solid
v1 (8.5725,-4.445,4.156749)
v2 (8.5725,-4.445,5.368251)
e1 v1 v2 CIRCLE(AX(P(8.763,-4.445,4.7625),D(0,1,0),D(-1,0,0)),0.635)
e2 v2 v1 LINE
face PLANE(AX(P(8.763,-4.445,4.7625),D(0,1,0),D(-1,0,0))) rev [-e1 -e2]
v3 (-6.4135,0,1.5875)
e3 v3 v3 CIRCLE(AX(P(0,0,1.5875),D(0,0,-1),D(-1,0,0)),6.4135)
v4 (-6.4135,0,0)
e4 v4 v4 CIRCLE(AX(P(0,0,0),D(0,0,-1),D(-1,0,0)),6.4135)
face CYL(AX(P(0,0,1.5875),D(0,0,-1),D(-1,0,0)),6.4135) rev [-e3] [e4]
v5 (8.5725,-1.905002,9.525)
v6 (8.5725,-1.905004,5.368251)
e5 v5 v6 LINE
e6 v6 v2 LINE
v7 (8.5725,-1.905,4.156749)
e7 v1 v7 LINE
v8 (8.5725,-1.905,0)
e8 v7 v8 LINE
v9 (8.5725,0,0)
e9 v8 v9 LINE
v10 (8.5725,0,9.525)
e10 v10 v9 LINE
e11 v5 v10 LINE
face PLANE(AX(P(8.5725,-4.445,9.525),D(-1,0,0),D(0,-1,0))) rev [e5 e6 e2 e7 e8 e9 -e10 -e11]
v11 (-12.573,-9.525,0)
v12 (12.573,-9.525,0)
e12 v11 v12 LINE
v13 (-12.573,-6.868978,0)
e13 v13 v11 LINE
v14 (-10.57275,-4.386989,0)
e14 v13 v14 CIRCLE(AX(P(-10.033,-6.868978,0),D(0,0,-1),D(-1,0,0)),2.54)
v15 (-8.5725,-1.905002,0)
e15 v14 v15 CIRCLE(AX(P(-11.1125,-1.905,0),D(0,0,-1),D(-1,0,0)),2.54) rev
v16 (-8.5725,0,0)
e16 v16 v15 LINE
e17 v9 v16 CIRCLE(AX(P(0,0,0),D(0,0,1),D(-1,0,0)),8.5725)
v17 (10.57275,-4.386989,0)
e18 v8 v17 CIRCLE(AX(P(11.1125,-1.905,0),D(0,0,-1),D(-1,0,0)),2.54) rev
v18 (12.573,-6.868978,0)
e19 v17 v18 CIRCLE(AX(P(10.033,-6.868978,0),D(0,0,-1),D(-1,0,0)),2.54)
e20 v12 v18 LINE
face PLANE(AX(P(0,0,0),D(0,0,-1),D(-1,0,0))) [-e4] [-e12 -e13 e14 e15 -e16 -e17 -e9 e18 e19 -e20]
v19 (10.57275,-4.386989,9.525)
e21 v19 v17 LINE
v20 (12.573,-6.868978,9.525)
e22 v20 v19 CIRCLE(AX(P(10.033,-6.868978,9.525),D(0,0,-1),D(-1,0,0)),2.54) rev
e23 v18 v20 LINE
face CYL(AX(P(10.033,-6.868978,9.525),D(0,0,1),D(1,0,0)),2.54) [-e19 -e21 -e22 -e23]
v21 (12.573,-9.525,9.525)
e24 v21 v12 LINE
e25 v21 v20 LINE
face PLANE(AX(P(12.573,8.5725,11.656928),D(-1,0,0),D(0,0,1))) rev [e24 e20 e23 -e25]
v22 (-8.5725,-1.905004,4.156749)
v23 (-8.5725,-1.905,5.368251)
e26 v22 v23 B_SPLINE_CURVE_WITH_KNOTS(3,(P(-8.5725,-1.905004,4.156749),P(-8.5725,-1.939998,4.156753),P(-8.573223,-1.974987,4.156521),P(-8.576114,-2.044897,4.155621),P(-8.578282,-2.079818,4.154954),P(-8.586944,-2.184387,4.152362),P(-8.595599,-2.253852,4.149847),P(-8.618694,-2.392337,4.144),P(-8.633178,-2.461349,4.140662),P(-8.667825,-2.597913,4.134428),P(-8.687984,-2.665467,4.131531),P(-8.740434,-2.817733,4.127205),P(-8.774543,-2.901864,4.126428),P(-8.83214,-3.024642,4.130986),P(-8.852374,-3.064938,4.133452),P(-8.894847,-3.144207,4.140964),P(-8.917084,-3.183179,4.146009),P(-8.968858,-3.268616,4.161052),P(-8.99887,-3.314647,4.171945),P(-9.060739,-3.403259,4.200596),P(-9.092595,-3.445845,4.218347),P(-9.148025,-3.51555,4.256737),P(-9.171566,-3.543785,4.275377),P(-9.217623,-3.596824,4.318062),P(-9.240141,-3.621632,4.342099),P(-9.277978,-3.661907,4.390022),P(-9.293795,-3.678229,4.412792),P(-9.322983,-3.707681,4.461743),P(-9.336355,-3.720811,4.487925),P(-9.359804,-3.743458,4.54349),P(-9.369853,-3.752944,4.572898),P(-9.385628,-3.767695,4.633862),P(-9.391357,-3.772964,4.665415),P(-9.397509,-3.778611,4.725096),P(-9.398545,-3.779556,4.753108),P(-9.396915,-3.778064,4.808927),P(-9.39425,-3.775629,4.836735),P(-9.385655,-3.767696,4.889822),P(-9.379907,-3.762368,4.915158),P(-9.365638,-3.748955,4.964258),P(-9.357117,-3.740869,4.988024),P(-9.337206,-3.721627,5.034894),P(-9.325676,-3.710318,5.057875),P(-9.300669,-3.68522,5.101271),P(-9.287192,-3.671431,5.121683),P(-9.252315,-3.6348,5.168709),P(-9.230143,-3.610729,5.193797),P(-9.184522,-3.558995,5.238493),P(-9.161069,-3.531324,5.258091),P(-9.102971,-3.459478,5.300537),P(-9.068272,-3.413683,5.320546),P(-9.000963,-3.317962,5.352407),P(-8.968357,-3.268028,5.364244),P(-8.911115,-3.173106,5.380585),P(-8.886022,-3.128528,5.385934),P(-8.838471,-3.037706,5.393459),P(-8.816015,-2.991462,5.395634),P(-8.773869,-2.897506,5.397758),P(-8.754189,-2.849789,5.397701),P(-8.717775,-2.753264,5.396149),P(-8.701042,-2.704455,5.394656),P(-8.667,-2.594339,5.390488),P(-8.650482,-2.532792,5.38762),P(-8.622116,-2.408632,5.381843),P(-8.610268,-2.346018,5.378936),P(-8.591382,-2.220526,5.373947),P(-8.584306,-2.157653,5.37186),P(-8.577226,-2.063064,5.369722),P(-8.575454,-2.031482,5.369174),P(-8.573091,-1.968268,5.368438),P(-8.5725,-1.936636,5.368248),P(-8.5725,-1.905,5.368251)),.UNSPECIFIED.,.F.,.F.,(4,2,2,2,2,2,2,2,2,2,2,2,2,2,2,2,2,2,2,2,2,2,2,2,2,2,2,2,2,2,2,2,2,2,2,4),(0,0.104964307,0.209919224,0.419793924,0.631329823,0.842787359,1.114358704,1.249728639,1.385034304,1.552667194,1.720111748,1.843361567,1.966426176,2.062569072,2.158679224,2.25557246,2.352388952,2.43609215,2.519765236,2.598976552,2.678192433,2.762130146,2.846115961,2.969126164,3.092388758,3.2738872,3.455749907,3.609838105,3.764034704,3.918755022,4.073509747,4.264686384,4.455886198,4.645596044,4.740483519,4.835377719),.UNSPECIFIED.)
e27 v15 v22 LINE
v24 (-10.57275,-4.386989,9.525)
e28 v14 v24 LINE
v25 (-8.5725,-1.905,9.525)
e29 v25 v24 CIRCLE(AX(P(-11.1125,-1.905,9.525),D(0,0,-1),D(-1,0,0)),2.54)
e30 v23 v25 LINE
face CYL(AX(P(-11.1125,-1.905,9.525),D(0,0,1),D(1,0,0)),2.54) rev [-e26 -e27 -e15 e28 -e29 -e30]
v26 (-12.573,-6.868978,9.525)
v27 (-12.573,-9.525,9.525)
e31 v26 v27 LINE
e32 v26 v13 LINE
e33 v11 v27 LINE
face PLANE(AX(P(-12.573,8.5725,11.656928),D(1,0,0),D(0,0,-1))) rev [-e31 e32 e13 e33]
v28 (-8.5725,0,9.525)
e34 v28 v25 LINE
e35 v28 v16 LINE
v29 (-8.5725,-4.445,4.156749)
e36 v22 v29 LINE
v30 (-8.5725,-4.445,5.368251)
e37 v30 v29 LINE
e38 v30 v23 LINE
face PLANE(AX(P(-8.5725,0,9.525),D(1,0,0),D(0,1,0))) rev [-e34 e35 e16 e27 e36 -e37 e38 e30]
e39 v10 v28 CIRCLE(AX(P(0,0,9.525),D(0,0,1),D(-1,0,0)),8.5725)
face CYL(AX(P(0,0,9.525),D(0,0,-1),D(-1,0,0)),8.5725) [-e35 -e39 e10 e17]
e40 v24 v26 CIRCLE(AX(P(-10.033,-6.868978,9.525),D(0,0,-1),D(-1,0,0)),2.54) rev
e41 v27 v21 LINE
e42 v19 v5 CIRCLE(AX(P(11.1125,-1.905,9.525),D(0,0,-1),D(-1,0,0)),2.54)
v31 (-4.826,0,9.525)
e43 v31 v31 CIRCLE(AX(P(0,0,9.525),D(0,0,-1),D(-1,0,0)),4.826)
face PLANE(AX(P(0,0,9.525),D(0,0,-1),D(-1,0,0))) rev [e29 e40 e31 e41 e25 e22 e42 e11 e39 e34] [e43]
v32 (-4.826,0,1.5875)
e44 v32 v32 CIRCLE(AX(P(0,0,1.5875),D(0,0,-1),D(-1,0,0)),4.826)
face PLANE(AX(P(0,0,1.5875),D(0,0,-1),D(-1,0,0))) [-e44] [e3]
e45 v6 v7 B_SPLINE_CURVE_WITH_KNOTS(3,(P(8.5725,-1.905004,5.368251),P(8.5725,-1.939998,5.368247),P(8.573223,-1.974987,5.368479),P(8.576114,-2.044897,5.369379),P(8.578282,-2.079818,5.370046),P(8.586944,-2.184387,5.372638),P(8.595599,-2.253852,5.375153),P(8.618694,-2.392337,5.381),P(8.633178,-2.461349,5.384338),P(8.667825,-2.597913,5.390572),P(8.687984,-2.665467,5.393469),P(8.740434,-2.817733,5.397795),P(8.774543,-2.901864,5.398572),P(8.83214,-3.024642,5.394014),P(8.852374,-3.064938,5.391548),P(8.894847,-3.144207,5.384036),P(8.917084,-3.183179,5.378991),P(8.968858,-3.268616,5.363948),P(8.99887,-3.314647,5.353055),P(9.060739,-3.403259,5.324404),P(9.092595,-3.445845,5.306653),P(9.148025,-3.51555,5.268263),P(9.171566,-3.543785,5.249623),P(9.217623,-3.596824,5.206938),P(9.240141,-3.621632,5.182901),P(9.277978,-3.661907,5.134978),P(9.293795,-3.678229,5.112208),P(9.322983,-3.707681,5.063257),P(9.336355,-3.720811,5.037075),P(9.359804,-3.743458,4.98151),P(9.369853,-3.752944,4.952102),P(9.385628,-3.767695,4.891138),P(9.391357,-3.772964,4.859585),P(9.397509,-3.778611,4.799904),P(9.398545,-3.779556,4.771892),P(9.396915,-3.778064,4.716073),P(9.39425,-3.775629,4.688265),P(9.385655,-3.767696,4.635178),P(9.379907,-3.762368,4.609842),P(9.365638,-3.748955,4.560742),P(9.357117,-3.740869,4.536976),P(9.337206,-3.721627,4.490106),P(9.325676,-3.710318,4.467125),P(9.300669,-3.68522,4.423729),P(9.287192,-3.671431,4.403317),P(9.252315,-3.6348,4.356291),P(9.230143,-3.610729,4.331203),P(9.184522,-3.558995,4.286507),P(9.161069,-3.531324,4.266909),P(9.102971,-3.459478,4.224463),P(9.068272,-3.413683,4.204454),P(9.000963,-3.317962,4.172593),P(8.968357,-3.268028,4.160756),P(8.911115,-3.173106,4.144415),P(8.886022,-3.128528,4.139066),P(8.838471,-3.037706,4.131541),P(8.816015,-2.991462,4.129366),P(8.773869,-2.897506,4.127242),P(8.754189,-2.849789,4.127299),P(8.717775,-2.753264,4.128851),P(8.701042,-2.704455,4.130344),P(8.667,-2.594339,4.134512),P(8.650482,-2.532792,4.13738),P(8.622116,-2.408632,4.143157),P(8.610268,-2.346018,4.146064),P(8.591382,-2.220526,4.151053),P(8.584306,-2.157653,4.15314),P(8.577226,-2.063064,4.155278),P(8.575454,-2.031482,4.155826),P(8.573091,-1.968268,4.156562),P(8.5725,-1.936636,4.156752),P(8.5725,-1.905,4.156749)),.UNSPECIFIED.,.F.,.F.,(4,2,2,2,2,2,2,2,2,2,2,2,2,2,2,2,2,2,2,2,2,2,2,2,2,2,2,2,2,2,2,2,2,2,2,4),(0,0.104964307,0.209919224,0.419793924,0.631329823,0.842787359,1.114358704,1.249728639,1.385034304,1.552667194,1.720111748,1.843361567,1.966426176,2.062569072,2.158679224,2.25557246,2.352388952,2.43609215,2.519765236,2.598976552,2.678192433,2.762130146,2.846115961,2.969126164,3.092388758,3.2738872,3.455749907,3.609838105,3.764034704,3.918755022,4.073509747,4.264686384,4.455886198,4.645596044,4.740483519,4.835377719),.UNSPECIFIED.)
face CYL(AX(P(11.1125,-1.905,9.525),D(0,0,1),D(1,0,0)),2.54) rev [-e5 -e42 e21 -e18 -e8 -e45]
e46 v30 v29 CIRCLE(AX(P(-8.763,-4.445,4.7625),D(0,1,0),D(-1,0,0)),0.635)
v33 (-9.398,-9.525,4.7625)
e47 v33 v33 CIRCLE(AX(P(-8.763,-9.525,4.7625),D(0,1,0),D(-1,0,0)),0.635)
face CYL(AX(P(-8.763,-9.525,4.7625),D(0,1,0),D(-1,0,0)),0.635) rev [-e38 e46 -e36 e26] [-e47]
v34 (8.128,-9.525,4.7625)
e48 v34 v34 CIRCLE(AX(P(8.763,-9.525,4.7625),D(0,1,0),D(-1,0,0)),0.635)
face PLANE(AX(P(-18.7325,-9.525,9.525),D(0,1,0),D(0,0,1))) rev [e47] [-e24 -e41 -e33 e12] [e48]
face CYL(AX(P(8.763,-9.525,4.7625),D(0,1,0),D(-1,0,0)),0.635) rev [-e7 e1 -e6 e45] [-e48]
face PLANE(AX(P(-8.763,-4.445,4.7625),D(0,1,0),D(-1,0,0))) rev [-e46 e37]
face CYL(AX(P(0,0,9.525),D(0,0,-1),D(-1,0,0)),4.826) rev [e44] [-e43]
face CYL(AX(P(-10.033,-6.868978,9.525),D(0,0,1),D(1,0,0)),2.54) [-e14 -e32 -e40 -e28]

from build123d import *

# Parameters (mm, degrees)
BOSS_EXTRUDE1_DEPTH = 9.525
SKETCH11_R          = 6.4135
CUT_EXTRUDE7_DEPTH  = 1.5875
SKETCH12_R          = 4.826
CUT_EXTRUDE8_DEPTH  = 23.464106648
SKETCH13_R          = 0.635
CUT_EXTRUDE9_DEPTH  = 25.720183808
FILLET1_R           = 2.54
SKETCH15_W          = 8.472670481
SKETCH15_H          = 13.323689659
SKETCH15_W_2        = 7.661730679
CUT_EXTRUDE10_DEPTH = 28.733584143
FILLET2_R           = 2.54


with BuildPart() as part:
    # Sketch10 → Boss-Extrude1 (new body)
    with BuildSketch(Plane.XY):
        with BuildLine():
            Line((-8.5725, 0), (-8.5725, -4.445))
            Line((-8.5725, -4.445), (-18.7325, -4.445))
            Line((-18.7325, -4.445), (-18.7325, -9.525))
            Line((-18.7325, -9.525), (18.7325, -9.525))
            Line((18.7325, -9.525), (18.7325, -4.445))
            Line((18.7325, -4.445), (8.5725, -4.445))
            Line((8.5725, -4.445), (8.5725, 0))
            ThreePointArc((8.5725, 0), (0, 8.5725), (-8.5725, 0))
        make_face()
    extrude(amount=BOSS_EXTRUDE1_DEPTH)

    # Sketch11 → Cut-Extrude7 (cut)
    with BuildSketch(Plane(origin=(0, 0, 0), x_dir=(-1, 0, 0), z_dir=(0, 0, -1))):
        Circle(SKETCH11_R)
    extrude(amount=-CUT_EXTRUDE7_DEPTH, mode=Mode.SUBTRACT)

    # Sketch12 → Cut-Extrude8 (cut, through all)
    with BuildSketch(Plane(origin=(0, 0, 1.5875), x_dir=(-1, 0, 0), z_dir=(0, 0, -1))):
        Circle(SKETCH12_R)
    extrude(amount=-CUT_EXTRUDE8_DEPTH, mode=Mode.SUBTRACT)

    # Sketch13 → Cut-Extrude9 (cut, through all)
    with BuildSketch(Plane(origin=(0, -4.445, 0), x_dir=(1, 0, 0), z_dir=(0, 1, 0))):
        with Locations(Location((-8.763, -4.7625, 0), (0, 0, 180))):
            Circle(SKETCH13_R)
        with Locations(Location((8.763, -4.7625, 0), (0, 0, 180))):
            Circle(SKETCH13_R)
    extrude(amount=-CUT_EXTRUDE9_DEPTH, mode=Mode.SUBTRACT)

    # Fillet1
    # the kernel refuses this fillet: 2.54 mm, written as the material it adds along each edge
    with BuildSketch(Plane(origin=(8.5725, -4.445, 0), x_dir=(0, 1, 0), z_dir=(0, 0, 1))) as fillet1_piece_1_section:
        with BuildLine():
            CenterArc((FILLET1_R, -FILLET1_R), FILLET1_R, 90, 90)
            Line((0, -FILLET1_R), (0, 0))
            Line((0, 0), (FILLET1_R, 0))
        make_face()
    fillet1_piece_1 = extrude(amount=10.506748607, mode=Mode.PRIVATE)
    fillet1_piece_1 = split(fillet1_piece_1, bisect_by=Plane(origin=(8.63691398, -2.568331275, 9.525), z_dir=(0, 0, -1)), keep=Keep.TOP, mode=Mode.PRIVATE)
    fillet1_piece_1 = fillet1_piece_1 - Plane(origin=(8.763, -2.568331275, 4.7625), x_dir=(-1, 0, 0), z_dir=(0, 1, 0)) * Cylinder(0.635, 32, mode=Mode.PRIVATE)
    add(fillet1_piece_1)
    with BuildSketch(Plane(origin=(-8.5725, -4.445, -0.981748607), x_dir=(0, 1, 0), z_dir=(0, 0, 1))) as fillet1_piece_2_section:
        with BuildLine():
            CenterArc((FILLET1_R, FILLET1_R), FILLET1_R, 180, 90)
            Line((0, FILLET1_R), (0, 0))
            Line((0, 0), (FILLET1_R, 0))
        make_face()
    fillet1_piece_2 = extrude(amount=10.506748607, mode=Mode.PRIVATE)
    fillet1_piece_2 = split(fillet1_piece_2, bisect_by=Plane(origin=(-8.636913982, -2.568331274, 0), z_dir=(0, 0, 1)), keep=Keep.TOP, mode=Mode.PRIVATE)
    fillet1_piece_2 = fillet1_piece_2 - Plane(origin=(-8.763, -2.568331274, 4.7625), x_dir=(-1, 0, 0), z_dir=(0, 1, 0)) * Cylinder(0.635, 32, mode=Mode.PRIVATE)
    add(fillet1_piece_2)
    # the kernel refuses this fillet: 2.54 mm, written as the material it takes off along each edge
    with BuildSketch(Plane(origin=(18.7325, -4.445, -6.35), x_dir=(-1, 0, 0), z_dir=(0, 0, 1)), Plane(origin=(-18.7325, -4.445, -6.35), x_dir=(0, -1, 0), z_dir=(0, 0, 1))) as fillet1_2_piece_1:
        with BuildLine():
            CenterArc((FILLET1_R, FILLET1_R), FILLET1_R, 180, 90)
            Line((0, FILLET1_R), (0, 0))
            Line((0, 0), (FILLET1_R, 0))
        make_face()
    extrude(amount=22.225, mode=Mode.SUBTRACT)

    # Sketch15 → Cut-Extrude10 (cut, through all)
    with BuildSketch(Plane.XZ.offset(9.525)):
        with Locations((-16.809335241, 4.995083112)):
            Rectangle(SKETCH15_W, SKETCH15_H)
        with Locations((16.40386534, 4.995083112)):
            Rectangle(SKETCH15_W_2, SKETCH15_H)
    extrude(amount=-CUT_EXTRUDE10_DEPTH, mode=Mode.SUBTRACT)

    # Fillet2
    fillet2_edges = [part.edges().sort_by_distance(p)[0] for p in [
        (12.573, -4.445, 4.7625),
        (-12.573, -4.445, 4.7625),
    ]]
    fillet(fillet2_edges, radius=FILLET2_R)


solid = part.part
